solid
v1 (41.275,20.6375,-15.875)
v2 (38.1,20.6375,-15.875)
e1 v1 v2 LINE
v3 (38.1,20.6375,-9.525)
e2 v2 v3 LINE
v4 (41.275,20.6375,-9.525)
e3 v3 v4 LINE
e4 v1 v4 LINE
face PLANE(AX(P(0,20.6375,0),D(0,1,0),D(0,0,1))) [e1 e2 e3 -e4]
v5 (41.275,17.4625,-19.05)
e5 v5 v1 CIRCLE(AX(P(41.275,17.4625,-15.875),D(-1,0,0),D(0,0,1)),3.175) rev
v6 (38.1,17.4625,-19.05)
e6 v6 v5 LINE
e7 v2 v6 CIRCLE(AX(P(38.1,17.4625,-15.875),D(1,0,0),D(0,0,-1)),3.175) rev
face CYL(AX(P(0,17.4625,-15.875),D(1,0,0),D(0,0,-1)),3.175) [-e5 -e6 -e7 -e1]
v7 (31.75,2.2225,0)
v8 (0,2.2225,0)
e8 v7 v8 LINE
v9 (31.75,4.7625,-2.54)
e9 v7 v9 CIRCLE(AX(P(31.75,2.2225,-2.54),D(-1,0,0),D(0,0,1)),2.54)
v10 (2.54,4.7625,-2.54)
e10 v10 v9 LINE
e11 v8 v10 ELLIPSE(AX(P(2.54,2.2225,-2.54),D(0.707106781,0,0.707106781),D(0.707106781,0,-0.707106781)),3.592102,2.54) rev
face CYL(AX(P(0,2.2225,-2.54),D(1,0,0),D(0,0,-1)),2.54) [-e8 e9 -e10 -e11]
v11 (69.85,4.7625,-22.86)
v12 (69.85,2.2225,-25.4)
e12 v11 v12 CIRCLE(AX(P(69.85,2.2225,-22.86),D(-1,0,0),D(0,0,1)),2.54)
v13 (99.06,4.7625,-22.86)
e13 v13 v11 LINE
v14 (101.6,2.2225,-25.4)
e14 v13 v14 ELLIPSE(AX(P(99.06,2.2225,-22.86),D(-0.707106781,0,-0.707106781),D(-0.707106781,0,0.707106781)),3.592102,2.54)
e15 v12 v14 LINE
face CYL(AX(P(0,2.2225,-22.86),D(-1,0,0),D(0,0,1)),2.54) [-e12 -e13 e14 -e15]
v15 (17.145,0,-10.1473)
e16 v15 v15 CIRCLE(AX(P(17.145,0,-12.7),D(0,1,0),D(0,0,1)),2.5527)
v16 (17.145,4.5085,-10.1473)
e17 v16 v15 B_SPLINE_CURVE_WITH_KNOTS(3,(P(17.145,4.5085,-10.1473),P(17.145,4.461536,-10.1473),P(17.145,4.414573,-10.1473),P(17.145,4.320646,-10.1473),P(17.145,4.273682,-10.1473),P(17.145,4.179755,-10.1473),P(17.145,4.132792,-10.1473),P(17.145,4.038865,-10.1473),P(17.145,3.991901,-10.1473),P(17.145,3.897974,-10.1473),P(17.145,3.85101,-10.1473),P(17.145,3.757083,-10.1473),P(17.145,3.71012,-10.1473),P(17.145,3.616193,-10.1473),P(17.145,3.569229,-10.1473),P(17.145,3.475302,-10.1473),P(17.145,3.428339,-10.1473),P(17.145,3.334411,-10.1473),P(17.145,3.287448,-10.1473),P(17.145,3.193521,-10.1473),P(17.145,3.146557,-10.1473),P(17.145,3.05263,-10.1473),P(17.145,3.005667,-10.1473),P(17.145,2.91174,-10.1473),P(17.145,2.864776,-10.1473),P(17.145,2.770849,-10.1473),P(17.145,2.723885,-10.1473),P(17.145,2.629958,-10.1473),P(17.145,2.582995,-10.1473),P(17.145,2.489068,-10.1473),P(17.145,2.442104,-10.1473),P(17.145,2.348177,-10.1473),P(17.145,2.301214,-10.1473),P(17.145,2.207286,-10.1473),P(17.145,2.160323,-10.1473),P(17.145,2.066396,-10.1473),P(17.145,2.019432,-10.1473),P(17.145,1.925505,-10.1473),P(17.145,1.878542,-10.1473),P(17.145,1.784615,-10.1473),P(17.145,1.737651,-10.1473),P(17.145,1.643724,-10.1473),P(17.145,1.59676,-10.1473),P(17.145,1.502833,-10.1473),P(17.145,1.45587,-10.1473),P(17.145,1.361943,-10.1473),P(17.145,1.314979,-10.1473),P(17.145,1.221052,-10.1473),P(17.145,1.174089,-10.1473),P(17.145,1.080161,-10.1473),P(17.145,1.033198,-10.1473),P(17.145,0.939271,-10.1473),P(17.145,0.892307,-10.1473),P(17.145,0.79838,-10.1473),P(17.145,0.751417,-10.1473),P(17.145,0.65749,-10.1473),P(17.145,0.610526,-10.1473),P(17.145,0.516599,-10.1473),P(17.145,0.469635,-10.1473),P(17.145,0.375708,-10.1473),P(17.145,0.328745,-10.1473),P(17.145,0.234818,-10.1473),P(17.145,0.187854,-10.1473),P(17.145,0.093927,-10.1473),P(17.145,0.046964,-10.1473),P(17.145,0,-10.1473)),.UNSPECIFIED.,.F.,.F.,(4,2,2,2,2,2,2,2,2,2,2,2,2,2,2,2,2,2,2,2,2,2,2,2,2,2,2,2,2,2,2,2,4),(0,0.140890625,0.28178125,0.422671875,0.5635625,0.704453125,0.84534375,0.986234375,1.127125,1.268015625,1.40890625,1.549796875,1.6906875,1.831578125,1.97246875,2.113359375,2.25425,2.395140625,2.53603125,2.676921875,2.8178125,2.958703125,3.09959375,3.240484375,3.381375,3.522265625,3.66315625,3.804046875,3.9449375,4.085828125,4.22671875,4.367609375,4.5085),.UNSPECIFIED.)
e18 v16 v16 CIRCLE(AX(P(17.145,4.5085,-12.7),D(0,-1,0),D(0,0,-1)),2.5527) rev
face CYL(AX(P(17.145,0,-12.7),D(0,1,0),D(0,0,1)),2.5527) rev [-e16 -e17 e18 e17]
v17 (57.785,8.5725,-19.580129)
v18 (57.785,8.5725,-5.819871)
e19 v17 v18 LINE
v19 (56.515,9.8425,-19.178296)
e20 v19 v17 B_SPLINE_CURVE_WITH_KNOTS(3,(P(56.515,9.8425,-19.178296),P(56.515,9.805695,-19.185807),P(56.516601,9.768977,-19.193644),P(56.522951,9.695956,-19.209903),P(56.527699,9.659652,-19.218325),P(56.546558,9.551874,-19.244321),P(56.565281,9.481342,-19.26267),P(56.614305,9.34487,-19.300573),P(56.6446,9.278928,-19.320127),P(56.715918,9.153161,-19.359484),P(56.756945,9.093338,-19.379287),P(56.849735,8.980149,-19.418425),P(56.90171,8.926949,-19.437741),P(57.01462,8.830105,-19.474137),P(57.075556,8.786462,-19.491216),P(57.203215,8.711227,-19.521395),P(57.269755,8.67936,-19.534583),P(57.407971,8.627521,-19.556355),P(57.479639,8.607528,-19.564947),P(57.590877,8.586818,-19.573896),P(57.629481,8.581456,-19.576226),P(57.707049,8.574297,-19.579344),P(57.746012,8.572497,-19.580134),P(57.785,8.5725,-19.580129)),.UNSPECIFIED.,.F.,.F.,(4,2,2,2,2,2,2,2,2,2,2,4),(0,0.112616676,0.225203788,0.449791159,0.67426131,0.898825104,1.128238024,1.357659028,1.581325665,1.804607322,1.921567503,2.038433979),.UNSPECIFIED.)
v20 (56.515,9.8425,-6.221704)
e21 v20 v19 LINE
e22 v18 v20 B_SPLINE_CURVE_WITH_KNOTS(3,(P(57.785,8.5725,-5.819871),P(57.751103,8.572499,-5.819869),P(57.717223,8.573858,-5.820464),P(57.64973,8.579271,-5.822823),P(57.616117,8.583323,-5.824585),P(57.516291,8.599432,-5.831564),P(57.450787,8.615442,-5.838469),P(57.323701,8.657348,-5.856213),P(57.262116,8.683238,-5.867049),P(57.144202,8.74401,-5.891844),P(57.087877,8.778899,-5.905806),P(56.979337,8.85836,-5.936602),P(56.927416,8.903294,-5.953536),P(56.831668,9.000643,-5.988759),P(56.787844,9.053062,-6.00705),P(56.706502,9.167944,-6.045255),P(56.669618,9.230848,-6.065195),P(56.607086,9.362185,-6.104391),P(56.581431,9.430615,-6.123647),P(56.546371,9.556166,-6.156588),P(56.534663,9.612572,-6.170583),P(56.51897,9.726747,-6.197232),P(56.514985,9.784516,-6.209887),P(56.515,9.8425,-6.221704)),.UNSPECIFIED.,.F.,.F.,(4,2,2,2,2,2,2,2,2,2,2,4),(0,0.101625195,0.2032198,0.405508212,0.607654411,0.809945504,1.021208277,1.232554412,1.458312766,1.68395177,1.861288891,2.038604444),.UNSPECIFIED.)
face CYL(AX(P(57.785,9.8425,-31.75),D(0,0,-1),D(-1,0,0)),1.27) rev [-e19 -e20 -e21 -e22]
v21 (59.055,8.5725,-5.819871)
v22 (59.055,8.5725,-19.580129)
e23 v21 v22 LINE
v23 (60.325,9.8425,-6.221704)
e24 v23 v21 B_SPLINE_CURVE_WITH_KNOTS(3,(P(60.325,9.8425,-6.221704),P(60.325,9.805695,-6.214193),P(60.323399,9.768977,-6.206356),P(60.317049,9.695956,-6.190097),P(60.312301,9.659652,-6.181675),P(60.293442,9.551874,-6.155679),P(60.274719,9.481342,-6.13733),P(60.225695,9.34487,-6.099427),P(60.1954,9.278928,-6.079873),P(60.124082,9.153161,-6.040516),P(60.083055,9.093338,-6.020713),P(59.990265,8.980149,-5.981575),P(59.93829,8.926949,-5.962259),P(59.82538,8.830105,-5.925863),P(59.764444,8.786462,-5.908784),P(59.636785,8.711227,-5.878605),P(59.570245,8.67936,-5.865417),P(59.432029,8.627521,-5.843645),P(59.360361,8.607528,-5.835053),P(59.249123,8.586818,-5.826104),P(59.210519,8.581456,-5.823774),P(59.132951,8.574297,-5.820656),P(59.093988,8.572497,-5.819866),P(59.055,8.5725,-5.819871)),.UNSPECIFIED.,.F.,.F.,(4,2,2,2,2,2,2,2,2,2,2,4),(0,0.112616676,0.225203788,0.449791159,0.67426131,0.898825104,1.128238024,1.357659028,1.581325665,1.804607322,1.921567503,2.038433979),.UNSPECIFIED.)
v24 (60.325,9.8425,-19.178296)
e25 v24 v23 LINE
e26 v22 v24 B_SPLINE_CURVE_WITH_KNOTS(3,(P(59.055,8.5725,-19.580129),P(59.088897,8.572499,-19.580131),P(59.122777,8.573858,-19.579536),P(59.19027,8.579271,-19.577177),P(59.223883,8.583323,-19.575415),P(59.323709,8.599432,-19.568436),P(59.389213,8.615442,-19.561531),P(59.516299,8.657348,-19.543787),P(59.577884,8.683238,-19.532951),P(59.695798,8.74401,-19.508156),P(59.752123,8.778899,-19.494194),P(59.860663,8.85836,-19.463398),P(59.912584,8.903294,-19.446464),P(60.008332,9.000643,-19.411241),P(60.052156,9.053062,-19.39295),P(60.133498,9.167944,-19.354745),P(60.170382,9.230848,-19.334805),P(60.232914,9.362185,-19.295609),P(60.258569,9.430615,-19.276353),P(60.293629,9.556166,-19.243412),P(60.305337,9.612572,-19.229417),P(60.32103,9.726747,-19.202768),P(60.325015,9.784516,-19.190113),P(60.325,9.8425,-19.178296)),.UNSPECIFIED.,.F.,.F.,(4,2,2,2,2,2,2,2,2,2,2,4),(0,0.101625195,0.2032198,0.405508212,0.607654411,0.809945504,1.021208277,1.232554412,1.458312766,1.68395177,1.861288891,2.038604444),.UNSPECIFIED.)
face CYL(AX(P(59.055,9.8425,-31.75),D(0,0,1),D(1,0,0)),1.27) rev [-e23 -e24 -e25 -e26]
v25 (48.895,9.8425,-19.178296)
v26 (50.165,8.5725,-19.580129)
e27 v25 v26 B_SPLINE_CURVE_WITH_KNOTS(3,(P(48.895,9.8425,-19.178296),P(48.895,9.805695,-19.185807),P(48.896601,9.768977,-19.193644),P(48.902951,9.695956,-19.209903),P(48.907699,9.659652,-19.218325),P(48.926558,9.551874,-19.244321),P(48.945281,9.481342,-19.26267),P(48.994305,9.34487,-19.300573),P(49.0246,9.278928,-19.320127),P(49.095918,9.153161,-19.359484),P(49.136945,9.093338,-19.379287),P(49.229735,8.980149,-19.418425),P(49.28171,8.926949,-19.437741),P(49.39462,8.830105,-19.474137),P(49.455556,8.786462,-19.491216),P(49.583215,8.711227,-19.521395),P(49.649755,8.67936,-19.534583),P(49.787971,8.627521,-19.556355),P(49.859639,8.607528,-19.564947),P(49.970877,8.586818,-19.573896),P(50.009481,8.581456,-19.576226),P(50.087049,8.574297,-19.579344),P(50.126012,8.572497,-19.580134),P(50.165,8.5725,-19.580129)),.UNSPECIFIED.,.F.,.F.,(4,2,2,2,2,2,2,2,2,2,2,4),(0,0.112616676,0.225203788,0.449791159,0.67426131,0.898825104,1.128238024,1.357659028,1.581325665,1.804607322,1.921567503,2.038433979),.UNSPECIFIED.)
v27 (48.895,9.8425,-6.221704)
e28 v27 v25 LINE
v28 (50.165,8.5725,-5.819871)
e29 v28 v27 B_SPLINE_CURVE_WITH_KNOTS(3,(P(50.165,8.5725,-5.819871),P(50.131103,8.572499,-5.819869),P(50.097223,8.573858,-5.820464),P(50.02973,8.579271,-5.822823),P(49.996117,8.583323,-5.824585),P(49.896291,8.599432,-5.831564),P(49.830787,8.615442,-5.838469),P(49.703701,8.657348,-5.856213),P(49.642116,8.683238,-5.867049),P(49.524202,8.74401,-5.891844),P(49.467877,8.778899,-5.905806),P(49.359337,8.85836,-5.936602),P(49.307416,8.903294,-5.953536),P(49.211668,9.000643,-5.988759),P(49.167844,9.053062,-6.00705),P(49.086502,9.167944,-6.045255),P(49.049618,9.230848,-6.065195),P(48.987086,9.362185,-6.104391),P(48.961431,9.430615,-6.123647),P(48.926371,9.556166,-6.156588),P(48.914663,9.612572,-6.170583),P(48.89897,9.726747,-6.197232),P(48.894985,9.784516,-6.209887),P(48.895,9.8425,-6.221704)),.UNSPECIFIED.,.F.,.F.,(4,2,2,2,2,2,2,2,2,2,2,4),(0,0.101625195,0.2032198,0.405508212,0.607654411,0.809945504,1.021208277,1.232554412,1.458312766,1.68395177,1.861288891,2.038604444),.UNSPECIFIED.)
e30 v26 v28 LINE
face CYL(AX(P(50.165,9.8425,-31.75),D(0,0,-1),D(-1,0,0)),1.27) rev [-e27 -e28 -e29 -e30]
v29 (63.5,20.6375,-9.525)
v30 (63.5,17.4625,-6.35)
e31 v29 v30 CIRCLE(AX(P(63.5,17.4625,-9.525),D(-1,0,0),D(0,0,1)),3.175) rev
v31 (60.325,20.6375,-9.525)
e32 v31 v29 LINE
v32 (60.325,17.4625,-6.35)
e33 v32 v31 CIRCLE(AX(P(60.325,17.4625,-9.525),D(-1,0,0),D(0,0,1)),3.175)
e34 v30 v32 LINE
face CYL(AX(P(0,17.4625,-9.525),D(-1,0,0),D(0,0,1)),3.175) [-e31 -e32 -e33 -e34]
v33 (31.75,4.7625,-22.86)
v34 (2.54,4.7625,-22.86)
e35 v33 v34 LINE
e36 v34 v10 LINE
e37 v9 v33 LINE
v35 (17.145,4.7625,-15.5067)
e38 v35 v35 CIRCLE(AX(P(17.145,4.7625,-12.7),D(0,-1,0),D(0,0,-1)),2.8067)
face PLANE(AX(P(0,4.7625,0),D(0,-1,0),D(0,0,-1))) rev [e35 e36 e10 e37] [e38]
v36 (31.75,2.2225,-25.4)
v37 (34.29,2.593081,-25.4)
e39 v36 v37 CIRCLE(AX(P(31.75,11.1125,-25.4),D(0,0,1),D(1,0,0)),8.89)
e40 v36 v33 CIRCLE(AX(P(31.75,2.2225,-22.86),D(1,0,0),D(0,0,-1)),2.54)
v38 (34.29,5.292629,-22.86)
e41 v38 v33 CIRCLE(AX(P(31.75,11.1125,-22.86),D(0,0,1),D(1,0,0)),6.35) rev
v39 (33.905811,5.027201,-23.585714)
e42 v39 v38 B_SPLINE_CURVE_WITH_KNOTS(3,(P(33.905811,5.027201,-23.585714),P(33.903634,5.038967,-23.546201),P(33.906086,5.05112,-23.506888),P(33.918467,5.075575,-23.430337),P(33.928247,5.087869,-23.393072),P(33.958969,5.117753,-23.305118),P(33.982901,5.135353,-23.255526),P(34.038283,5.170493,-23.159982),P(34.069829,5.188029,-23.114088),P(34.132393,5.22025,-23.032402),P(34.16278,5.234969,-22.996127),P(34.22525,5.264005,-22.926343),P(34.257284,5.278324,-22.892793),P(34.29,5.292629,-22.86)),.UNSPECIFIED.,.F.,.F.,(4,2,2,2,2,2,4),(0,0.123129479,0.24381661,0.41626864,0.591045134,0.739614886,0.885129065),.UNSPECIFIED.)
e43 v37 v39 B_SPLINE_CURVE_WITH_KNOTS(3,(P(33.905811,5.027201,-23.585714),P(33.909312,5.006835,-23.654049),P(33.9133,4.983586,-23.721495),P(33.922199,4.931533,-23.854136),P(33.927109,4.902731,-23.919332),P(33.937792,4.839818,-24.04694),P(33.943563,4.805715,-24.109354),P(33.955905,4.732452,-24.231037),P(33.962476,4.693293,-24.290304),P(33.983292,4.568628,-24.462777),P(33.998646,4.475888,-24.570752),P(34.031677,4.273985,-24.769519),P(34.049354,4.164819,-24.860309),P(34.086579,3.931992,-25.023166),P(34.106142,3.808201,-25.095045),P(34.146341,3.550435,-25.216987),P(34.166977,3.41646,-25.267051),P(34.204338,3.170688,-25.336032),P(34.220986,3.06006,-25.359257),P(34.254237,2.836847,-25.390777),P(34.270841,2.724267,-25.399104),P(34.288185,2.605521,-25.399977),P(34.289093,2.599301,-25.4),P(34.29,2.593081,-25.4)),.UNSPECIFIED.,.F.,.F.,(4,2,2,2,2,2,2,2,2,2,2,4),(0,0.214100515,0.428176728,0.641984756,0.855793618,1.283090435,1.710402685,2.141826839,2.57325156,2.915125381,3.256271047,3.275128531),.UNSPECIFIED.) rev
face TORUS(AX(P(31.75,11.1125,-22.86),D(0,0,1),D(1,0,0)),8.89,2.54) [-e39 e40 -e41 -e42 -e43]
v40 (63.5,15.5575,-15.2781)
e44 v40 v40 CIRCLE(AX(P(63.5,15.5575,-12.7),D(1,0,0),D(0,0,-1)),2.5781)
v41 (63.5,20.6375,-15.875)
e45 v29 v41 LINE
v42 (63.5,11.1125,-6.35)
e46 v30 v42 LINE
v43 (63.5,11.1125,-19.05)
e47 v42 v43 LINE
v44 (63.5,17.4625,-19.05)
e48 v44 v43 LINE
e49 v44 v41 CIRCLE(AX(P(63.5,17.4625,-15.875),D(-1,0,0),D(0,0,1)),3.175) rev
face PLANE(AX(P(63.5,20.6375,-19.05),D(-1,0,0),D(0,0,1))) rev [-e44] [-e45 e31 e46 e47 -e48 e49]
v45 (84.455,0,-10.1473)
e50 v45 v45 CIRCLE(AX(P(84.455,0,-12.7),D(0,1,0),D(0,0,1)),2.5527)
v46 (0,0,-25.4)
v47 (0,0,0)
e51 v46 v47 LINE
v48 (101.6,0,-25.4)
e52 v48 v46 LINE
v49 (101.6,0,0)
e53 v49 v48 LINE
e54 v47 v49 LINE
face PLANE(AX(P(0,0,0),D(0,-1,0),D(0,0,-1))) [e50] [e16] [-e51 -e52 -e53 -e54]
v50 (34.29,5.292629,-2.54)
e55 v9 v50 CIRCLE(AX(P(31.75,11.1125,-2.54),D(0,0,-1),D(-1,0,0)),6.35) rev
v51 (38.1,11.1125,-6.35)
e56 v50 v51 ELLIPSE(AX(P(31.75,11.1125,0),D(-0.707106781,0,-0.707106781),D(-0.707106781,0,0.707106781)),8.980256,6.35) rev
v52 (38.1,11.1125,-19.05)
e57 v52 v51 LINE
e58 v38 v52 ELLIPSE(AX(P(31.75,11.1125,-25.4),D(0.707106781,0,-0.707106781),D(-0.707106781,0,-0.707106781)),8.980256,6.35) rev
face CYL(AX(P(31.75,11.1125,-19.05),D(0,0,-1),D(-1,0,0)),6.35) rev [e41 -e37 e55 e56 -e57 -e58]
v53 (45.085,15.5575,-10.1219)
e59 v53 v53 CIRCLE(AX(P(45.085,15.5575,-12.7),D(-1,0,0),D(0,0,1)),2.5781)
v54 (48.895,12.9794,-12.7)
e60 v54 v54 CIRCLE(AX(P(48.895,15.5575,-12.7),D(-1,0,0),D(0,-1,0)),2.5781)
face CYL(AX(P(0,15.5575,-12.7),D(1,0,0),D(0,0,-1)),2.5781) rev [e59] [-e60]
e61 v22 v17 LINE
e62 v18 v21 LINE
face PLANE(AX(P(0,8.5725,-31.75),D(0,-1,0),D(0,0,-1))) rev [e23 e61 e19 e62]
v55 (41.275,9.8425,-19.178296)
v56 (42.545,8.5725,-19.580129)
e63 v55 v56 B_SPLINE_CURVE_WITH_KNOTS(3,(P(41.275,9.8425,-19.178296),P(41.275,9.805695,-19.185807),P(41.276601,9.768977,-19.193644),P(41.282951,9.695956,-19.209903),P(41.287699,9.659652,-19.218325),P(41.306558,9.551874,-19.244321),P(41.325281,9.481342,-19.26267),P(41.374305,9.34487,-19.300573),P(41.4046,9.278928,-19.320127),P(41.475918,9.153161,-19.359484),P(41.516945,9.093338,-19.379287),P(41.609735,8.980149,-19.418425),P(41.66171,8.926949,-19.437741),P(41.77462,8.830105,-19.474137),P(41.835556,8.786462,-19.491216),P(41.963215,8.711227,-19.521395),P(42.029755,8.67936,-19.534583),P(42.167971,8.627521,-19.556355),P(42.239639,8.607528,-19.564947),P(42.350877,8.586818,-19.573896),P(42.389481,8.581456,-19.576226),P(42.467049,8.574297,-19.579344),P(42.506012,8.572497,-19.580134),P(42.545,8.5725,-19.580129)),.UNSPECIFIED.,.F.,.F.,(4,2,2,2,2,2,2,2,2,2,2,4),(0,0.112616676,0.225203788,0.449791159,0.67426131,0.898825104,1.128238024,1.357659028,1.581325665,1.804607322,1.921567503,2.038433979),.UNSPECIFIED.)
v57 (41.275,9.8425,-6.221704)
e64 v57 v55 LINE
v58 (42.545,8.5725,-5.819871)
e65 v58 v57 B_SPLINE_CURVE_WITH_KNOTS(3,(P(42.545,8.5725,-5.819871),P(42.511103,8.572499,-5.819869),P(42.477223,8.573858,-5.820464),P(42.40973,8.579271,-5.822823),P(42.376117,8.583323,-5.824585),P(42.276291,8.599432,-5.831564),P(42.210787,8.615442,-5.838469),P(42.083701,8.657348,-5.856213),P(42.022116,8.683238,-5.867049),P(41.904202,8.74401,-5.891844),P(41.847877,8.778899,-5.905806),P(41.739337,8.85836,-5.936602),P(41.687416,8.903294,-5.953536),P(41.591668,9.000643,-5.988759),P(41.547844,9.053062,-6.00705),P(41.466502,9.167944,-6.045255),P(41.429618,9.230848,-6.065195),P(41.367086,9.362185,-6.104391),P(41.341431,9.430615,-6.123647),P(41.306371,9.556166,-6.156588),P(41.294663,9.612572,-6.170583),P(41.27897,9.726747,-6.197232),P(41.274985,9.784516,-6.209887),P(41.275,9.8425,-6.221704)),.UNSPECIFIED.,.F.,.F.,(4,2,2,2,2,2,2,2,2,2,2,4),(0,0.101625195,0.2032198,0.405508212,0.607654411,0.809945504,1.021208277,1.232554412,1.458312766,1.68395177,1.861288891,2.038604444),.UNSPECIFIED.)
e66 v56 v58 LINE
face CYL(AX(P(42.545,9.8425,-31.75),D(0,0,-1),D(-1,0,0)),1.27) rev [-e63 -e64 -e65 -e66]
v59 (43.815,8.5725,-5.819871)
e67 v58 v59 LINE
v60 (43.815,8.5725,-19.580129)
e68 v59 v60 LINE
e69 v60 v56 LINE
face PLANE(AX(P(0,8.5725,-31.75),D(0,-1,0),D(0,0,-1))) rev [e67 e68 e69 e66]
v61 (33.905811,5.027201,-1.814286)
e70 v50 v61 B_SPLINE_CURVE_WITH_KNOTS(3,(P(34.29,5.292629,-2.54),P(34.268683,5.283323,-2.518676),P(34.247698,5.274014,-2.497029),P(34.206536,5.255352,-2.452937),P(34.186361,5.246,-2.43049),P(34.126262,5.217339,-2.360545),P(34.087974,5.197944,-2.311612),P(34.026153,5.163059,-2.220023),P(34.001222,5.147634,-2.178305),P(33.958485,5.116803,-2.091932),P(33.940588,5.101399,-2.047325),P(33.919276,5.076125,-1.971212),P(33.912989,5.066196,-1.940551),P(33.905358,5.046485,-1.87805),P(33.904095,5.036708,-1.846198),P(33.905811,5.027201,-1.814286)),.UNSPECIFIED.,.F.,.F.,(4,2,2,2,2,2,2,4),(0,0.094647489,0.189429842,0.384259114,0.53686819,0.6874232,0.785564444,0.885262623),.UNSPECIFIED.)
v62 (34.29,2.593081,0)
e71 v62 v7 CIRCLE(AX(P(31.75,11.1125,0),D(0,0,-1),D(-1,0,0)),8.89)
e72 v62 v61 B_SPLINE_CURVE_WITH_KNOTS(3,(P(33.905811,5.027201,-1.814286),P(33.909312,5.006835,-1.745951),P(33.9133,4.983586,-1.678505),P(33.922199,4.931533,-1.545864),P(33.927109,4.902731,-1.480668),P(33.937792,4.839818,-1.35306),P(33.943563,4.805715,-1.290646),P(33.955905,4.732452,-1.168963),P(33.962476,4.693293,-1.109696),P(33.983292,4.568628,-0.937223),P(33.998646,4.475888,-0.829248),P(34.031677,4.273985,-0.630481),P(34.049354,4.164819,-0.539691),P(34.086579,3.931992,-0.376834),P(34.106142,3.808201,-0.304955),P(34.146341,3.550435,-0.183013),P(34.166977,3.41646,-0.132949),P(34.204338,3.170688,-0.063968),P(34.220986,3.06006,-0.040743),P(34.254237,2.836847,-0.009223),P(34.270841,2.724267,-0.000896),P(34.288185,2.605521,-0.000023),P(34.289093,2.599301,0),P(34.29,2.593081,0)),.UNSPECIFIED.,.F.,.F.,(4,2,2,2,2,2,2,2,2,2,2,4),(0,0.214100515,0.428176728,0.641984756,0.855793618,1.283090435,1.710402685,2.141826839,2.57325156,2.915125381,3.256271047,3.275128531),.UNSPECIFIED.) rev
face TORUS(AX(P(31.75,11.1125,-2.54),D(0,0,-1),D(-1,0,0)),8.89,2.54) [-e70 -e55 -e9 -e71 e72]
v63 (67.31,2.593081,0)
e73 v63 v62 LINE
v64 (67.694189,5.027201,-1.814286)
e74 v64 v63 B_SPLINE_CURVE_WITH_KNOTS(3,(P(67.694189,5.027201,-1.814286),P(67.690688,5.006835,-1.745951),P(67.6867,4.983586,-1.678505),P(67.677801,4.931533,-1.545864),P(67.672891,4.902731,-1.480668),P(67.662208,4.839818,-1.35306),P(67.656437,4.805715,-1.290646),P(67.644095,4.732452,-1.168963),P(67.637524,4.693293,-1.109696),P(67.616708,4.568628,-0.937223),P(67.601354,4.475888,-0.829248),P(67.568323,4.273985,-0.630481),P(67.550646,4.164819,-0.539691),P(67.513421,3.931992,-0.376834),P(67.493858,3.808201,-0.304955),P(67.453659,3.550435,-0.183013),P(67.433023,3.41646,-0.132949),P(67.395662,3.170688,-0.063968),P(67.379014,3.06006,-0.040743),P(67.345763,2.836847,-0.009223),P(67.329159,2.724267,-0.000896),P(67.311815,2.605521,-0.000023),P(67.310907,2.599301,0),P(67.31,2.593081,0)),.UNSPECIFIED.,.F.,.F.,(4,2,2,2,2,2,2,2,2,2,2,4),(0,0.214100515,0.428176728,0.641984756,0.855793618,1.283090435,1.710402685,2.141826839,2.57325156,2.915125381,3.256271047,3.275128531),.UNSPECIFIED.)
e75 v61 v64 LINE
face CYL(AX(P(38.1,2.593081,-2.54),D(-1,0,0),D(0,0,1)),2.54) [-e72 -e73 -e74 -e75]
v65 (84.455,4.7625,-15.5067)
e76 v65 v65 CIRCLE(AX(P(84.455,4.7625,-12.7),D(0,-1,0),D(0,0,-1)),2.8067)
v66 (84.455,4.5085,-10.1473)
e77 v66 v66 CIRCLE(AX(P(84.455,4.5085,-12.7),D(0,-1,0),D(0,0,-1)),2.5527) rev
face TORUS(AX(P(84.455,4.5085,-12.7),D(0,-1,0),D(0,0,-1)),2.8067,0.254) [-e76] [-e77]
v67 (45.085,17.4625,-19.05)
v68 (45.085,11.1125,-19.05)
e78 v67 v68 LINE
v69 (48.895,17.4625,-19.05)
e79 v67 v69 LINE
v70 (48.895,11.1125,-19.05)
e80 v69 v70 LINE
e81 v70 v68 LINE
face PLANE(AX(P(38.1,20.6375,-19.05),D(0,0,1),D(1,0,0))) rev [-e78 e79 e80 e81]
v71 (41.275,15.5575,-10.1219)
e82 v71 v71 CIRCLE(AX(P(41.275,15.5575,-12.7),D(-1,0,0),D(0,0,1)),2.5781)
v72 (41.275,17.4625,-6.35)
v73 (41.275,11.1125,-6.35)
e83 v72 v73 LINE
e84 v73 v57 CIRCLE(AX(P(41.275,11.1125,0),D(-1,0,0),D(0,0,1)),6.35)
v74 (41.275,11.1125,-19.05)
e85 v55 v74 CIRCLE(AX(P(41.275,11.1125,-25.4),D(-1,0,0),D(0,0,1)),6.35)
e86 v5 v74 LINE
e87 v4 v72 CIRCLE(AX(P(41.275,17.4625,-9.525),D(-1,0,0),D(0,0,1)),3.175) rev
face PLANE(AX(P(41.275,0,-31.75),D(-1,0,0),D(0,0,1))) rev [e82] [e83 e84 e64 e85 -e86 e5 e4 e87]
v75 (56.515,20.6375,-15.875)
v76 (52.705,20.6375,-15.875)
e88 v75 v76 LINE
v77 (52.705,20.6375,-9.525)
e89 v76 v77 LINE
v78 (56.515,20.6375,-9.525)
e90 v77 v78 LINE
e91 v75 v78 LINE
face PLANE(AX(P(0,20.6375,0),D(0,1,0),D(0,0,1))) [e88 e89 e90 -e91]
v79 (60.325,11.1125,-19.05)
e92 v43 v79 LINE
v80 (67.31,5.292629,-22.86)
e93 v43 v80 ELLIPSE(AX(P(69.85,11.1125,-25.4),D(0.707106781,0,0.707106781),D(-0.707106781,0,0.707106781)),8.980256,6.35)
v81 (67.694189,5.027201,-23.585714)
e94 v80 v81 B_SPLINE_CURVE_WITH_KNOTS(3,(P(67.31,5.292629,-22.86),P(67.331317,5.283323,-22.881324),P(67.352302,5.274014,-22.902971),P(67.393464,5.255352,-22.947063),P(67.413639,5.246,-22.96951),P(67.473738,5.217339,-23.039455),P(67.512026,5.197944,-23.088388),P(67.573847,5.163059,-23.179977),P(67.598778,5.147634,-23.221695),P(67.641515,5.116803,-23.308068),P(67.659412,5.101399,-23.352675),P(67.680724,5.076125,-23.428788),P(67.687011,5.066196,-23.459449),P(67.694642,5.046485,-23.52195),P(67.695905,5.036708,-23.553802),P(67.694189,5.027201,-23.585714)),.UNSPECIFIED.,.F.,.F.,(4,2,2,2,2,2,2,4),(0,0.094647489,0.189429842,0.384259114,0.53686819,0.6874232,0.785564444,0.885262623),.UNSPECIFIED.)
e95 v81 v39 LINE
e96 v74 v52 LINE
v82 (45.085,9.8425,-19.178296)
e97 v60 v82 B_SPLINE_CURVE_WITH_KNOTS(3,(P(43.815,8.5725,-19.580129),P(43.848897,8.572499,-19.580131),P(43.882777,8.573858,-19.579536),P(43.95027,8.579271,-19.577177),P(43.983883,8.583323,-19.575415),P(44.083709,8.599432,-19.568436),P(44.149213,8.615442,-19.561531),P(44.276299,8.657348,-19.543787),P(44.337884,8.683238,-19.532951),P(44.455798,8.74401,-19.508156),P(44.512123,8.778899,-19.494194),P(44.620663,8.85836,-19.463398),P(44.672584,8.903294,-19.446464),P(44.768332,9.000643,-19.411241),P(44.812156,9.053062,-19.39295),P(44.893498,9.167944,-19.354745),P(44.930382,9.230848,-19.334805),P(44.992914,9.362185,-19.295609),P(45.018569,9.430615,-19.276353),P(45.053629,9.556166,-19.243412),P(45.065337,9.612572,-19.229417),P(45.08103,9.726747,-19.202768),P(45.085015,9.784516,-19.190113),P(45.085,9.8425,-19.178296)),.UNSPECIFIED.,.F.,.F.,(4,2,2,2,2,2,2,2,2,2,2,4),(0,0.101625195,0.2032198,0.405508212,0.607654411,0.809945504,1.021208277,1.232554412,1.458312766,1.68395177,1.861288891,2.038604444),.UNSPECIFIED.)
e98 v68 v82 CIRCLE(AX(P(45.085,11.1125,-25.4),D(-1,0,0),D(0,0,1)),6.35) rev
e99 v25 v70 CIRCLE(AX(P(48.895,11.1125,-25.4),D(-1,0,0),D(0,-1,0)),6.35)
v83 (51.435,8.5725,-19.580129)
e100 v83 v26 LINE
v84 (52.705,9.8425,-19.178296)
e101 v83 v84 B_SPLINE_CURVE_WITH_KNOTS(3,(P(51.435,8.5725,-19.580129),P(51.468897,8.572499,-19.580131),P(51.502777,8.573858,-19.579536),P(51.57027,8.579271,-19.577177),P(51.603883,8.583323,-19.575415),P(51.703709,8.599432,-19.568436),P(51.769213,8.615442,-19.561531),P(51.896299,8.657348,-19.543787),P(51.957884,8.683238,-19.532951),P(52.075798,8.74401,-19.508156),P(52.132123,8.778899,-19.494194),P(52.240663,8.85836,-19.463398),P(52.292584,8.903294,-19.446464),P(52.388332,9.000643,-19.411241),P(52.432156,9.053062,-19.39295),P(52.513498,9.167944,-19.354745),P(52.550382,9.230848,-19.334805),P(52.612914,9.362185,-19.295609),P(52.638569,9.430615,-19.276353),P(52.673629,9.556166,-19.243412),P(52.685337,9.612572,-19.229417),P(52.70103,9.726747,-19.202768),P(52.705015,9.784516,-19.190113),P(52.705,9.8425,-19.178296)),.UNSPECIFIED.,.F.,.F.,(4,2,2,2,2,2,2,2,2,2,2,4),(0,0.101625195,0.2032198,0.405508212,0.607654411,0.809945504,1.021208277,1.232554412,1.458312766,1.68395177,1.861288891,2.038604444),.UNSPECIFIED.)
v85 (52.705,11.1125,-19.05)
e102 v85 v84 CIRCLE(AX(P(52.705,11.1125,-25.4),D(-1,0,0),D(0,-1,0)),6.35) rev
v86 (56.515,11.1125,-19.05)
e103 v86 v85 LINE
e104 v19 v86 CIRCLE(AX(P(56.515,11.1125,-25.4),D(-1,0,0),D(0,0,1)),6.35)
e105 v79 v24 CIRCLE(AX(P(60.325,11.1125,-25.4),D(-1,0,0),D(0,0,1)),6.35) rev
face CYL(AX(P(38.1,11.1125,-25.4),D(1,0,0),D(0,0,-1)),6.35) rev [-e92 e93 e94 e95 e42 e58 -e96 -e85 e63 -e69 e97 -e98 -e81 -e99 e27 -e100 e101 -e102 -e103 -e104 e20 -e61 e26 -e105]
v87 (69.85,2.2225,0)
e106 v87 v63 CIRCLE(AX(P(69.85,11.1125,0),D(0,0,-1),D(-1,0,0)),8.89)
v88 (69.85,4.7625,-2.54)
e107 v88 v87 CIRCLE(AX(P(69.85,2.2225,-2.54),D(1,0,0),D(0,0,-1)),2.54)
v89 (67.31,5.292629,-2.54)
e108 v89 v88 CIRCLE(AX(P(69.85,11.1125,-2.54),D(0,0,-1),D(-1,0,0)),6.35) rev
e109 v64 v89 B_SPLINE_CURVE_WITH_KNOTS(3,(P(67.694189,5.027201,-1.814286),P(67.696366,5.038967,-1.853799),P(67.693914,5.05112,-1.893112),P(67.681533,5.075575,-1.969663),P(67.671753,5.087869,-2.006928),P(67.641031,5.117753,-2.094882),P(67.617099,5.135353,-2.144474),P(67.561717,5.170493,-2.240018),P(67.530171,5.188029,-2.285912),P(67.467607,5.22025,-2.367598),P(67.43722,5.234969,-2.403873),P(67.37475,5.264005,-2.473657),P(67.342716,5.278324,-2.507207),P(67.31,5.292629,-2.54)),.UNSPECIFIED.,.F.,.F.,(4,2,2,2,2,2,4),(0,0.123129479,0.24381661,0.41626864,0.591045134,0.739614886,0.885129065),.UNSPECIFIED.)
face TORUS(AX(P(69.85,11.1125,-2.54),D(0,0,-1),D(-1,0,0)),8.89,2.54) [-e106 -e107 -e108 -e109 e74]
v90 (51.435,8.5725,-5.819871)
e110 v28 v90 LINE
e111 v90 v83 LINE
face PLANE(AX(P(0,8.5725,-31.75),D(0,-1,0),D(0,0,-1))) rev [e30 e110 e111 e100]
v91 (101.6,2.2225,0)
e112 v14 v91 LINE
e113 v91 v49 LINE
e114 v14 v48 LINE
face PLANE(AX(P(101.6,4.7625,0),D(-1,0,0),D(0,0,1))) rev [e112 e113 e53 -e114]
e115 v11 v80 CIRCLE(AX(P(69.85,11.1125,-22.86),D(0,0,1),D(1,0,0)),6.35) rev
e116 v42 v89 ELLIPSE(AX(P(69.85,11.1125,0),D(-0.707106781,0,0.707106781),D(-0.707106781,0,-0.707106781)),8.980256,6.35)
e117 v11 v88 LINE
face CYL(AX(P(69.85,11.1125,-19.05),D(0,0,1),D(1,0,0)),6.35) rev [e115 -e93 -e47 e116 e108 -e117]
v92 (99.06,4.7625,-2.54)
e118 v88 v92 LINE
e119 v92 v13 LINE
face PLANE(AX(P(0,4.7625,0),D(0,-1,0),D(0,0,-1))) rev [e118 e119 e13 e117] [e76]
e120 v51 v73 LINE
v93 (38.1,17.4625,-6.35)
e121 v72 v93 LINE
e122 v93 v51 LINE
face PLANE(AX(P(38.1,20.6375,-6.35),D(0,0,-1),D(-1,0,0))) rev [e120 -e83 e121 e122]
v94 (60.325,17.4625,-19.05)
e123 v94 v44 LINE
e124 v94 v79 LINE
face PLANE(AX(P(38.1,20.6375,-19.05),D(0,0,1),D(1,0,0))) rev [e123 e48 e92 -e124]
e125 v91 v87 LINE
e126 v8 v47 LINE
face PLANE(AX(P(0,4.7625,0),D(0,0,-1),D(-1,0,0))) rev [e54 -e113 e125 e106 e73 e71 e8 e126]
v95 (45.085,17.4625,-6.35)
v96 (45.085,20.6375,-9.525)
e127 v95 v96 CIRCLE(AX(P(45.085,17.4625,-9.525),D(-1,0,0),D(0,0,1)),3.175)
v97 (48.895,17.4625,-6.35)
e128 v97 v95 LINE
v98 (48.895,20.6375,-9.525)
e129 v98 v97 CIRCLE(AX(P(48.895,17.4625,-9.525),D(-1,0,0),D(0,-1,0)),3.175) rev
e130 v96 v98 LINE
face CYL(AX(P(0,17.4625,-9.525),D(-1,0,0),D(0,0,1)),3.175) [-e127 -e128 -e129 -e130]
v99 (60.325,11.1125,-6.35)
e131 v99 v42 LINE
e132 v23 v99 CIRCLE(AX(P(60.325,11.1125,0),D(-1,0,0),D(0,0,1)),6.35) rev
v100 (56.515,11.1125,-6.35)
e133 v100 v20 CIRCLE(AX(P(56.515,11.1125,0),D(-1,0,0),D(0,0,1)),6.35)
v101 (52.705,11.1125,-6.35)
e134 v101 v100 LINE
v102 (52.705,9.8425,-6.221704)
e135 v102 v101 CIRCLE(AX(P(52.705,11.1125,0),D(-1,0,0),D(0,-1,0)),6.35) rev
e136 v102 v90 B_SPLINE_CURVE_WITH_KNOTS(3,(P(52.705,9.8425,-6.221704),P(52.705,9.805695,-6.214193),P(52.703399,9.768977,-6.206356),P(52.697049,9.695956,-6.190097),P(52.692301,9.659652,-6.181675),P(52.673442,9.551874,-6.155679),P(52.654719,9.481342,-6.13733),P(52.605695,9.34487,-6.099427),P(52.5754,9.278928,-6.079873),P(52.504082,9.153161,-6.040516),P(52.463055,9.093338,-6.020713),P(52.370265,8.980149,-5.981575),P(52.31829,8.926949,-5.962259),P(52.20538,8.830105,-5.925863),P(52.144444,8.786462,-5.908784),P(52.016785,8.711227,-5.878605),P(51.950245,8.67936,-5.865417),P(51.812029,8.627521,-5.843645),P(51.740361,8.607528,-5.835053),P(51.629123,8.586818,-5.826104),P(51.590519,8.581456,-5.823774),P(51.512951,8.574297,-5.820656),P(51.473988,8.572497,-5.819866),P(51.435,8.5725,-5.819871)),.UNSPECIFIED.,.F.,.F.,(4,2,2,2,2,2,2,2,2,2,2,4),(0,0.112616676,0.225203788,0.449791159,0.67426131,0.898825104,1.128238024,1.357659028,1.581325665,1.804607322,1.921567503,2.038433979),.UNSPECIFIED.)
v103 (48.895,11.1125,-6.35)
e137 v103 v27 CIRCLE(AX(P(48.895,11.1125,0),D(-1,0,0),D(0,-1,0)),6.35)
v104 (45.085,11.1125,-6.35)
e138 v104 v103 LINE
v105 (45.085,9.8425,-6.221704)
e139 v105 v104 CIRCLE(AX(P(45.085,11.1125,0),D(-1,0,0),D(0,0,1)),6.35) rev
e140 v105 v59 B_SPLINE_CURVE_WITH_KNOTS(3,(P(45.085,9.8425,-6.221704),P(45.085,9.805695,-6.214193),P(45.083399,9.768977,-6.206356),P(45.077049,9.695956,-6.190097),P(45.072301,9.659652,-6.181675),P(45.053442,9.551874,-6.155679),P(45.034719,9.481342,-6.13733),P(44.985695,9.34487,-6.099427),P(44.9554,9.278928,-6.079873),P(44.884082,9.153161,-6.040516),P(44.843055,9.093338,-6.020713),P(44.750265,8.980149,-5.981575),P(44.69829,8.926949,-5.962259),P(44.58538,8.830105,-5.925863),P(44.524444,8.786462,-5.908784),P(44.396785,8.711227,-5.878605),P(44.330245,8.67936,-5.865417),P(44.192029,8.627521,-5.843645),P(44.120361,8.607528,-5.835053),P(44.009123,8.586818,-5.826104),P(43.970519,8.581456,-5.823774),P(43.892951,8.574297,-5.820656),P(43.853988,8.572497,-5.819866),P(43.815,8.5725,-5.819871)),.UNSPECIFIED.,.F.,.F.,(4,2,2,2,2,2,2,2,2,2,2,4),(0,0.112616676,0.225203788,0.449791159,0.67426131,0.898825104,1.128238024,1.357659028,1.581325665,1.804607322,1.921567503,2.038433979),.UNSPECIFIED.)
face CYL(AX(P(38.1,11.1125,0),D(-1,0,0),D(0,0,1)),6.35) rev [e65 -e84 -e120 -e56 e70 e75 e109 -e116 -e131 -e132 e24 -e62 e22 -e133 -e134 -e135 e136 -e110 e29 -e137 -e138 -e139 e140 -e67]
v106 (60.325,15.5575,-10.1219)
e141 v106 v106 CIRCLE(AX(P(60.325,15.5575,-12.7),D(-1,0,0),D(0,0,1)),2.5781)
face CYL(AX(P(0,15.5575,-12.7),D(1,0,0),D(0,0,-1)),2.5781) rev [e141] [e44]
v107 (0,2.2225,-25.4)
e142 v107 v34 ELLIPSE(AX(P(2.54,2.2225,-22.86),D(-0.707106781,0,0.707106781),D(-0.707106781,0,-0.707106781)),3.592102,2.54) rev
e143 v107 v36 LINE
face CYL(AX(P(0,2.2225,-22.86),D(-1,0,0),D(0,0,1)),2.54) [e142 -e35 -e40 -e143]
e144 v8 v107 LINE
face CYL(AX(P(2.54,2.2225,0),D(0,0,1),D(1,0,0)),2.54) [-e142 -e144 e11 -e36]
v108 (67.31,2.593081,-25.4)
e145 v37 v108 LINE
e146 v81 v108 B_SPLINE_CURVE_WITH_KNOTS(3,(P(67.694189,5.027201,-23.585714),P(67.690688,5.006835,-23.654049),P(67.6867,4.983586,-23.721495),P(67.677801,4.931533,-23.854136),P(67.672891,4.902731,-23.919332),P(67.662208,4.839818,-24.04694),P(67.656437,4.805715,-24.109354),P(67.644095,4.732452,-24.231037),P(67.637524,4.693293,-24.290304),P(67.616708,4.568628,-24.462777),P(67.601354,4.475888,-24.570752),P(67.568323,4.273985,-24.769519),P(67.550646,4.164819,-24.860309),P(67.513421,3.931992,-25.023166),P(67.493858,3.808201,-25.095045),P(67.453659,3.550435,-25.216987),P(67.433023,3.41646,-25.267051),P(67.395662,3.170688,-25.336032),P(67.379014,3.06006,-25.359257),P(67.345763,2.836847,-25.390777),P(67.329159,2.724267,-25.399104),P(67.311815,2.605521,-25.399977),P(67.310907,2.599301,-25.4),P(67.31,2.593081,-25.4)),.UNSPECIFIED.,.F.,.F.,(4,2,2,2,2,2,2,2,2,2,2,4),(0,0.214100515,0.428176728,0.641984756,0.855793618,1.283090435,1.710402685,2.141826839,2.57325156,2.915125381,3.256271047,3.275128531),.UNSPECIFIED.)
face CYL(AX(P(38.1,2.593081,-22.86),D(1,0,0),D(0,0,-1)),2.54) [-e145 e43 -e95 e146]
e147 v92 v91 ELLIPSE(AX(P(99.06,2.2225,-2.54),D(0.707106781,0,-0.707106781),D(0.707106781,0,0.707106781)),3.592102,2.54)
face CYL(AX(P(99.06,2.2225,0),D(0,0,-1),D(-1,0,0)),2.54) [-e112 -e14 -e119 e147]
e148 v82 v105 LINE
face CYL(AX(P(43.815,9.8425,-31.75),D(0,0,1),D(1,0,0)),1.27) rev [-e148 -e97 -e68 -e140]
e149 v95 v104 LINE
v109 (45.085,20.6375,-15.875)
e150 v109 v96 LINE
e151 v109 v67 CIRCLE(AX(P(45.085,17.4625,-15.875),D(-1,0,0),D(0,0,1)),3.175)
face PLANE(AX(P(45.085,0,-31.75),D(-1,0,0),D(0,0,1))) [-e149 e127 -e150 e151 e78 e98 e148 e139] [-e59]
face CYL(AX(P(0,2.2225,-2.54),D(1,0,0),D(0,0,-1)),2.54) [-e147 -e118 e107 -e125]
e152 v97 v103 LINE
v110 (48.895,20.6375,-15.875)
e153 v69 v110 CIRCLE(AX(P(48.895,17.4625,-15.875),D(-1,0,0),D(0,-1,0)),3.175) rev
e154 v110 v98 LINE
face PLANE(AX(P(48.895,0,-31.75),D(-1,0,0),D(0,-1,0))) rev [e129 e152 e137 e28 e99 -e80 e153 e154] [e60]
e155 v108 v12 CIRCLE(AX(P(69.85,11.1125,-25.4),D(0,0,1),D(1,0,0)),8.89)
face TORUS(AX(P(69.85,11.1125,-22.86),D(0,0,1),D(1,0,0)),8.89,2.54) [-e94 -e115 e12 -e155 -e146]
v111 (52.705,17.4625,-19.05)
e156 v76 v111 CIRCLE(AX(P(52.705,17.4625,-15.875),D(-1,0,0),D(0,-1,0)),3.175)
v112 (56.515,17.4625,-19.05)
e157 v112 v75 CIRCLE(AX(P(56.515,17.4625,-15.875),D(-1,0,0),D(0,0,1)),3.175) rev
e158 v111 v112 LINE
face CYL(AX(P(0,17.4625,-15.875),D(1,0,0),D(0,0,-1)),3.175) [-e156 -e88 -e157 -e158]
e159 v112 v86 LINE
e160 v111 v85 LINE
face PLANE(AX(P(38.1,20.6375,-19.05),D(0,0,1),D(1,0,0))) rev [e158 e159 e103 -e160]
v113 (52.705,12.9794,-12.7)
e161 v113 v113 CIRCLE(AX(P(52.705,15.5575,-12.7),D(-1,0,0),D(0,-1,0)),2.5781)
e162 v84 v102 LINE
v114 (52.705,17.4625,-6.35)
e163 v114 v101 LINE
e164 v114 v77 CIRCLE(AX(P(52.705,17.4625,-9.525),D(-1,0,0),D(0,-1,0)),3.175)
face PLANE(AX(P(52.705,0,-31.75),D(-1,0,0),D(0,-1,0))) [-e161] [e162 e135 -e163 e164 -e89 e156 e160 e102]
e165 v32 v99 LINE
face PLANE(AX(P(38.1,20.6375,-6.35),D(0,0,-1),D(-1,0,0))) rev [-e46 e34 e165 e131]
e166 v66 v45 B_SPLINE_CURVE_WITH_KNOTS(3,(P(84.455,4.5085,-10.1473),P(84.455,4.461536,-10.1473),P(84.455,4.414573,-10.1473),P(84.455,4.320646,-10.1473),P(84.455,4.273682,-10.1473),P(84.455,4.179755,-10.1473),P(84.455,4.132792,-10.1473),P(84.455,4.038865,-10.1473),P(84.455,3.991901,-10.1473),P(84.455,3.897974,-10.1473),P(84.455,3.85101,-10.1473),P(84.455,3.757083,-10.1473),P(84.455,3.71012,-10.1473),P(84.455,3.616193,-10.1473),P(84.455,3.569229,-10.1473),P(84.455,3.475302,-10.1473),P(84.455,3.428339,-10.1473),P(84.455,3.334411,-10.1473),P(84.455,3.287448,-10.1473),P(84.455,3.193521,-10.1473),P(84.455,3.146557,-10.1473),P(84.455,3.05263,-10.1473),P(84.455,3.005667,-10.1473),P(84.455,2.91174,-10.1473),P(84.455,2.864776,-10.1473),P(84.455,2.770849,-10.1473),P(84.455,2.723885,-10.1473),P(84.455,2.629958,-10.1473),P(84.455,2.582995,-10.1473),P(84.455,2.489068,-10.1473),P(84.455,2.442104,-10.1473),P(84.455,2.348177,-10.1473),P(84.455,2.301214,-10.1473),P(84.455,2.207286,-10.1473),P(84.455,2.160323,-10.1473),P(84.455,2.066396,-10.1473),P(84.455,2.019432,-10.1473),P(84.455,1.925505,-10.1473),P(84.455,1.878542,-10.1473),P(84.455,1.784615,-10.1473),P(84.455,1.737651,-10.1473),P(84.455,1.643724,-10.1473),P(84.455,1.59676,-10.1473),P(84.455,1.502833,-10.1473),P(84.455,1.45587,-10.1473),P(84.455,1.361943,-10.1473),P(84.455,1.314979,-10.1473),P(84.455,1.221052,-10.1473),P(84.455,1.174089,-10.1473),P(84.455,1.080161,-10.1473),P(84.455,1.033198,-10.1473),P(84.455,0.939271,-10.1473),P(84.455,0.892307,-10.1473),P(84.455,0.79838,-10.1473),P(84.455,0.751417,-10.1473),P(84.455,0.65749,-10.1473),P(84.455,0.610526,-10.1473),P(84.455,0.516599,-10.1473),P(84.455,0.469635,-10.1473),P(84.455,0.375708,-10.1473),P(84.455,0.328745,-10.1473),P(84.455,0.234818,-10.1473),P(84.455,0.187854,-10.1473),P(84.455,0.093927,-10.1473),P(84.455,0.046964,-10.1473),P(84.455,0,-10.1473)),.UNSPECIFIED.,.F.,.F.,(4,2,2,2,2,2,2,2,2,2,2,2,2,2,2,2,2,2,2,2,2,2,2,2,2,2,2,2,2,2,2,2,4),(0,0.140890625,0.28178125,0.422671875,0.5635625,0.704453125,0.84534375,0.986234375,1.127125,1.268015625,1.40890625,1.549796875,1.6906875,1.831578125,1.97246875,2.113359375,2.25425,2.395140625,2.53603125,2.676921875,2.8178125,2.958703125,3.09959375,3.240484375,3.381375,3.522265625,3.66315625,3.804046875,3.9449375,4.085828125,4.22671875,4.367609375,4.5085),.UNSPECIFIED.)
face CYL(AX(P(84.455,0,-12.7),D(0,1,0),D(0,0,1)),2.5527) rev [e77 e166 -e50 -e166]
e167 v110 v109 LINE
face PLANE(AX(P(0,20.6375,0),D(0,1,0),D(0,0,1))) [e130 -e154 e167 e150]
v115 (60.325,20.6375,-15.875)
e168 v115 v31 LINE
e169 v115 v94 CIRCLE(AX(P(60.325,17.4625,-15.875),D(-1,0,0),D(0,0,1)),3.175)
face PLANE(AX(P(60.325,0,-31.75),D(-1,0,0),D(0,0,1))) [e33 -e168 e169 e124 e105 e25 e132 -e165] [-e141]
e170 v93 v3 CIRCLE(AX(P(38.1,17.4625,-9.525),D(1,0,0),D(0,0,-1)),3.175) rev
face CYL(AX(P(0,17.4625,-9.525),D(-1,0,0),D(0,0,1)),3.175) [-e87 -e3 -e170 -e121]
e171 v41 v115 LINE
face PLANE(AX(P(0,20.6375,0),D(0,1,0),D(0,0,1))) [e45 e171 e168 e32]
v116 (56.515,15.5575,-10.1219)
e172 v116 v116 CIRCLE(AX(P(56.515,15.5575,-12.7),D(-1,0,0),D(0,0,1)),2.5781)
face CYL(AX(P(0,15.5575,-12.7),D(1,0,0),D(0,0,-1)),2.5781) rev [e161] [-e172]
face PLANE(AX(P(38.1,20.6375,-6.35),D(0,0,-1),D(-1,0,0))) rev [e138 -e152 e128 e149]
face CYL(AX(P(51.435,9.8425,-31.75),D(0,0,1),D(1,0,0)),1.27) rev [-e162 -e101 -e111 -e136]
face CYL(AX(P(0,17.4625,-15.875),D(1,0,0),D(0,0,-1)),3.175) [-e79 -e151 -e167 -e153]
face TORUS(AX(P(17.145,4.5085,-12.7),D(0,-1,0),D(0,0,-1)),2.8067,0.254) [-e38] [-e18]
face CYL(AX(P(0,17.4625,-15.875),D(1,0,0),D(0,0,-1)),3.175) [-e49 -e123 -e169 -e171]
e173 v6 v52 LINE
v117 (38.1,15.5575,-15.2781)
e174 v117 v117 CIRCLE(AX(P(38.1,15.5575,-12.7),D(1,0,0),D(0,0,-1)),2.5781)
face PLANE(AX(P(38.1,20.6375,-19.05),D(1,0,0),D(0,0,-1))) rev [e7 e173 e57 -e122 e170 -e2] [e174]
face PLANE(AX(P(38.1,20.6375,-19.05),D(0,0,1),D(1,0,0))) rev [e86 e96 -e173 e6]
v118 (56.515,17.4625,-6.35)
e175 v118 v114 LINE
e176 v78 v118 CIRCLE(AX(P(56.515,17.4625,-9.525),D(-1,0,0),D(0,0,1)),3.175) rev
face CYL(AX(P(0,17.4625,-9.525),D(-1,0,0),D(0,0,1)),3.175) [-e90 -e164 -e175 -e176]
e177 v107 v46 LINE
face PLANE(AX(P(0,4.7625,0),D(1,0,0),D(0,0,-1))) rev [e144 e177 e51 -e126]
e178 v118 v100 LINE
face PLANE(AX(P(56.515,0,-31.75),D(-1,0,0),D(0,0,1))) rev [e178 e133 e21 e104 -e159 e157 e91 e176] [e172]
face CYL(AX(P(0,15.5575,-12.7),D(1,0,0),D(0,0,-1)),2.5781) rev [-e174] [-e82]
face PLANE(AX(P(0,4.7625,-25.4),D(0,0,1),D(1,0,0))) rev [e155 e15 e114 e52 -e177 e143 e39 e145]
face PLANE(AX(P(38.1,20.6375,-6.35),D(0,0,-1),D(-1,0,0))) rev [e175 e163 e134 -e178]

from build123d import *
from build123d.topology import SkipClean

# Parameters (mm, degrees)
SKETCH1_W           = 101.6
SKETCH1_H           = 25.4
BOSS_EXTRUDE1_DEPTH = 4.7625
SKETCH2_W           = 25.4
SKETCH2_H           = 12.7
BOSS_EXTRUDE2_DEPTH = 15.875
SKETCH3_W           = 3.81
SKETCH3_H           = 12.065
CUT_EXTRUDE1_DEPTH  = 25.4
SKETCH4_R           = 2.5781
CUT_EXTRUDE2_DEPTH  = 72.4375
FILLET2_START       = 45.085
FILLET2_DEPTH       = 3.81
FILLET2_START_2     = 52.705
FILLET2_2_DEPTH     = 3.81
FILLET2_START_3     = 38.1
FILLET2_3_DEPTH     = 3.175
FILLET2_START_4     = 60.325
FILLET2_4_DEPTH     = 3.175
FILLET2_START_5     = -25.4
FILLET2_5_OUTLINE_W = 3.81
FILLET2_5_OUTLINE_H = 3.81
FILLET2_5_DEPTH     = 25.4
FILLET2_6_DEPTH     = 101.6
FILLET3_2_DEPTH     = 101.6
FILLET3_3_DEPTH     = 31.75
FILLET3_START       = 69.85
FILLET3_4_DEPTH     = 31.75
FILLET3_START_2     = -26
FILLET3_5_DEPTH     = 27
FILLET4_R           = 3.175
FILLET5_R           = 1.27
SKETCH5_R           = 2.5527
CUT_EXTRUDE3_DEPTH  = 106.923253491
FILLET6_R           = 0.254


with BuildPart() as part:
    # Sketch1 → Boss-Extrude1 (new body)
    with BuildSketch(Plane(origin=(0, 0, 0), x_dir=(1, 0, 0), z_dir=(0, 1, 0))):
        with Locations((50.8, 12.7)):
            Rectangle(SKETCH1_W, SKETCH1_H)
    extrude(amount=BOSS_EXTRUDE1_DEPTH)

    # Sketch2 → Boss-Extrude2 (add)
    with BuildSketch(Plane(origin=(0, 4.7625, 0), x_dir=(1, 0, 0), z_dir=(0, 1, 0))):
        with Locations((50.8, 12.7)):
            Rectangle(SKETCH2_W, SKETCH2_H)
    extrude(amount=BOSS_EXTRUDE2_DEPTH)

    # Sketch3 → Cut-Extrude1 (cut)
    with BuildSketch(Plane.XY.offset(-6.35)):
        with Locations((50.8, 14.605)):
            Rectangle(SKETCH3_W, SKETCH3_H)
        with Locations((43.18, 14.605)):
            Rectangle(SKETCH3_W, SKETCH3_H)
        with Locations((58.42, 14.605)):
            Rectangle(SKETCH3_W, SKETCH3_H)
    extrude(amount=-CUT_EXTRUDE1_DEPTH, mode=Mode.SUBTRACT)

    # Sketch4 → Cut-Extrude2 (cut, through all)
    with BuildSketch(Plane(origin=(63.5, 0, 0), x_dir=(0, 0, -1), z_dir=(1, 0, 0))):
        with Locations((12.7, 15.5575)):
            Circle(SKETCH4_R)
    extrude(amount=-CUT_EXTRUDE2_DEPTH, mode=Mode.SUBTRACT)

    # Fillet2: read off the stored shape, not the designer's step
    # Fillet2 outline → Fillet2 (add)
    with BuildSketch(Plane.YZ.offset(FILLET2_START)):
        with BuildLine():
            Line((4.7625, -6.35), (11.1125, -6.35))
            ThreePointArc((11.1125, -6.35), (6.622371939, -4.490128061), (4.7625, 0))
            Line((4.7625, 0), (4.7625, -6.35))
        make_face()
        with BuildLine():
            Line((11.1125, -19.05), (4.7625, -19.05))
            Line((4.7625, -19.05), (4.7625, -25.4))
            ThreePointArc((4.7625, -25.4), (6.622371939, -20.909871939), (11.1125, -19.05))
        make_face()
    extrude(amount=FILLET2_DEPTH)

    # Fillet2 2 outline → Fillet2 2 (add)
    with BuildSketch(Plane.YZ.offset(FILLET2_START_2)):
        with BuildLine():
            Line((4.7625, -6.35), (11.1125, -6.35))
            ThreePointArc((11.1125, -6.35), (6.622371939, -4.490128061), (4.7625, 0))
            Line((4.7625, 0), (4.7625, -6.35))
        make_face()
        with BuildLine():
            Line((11.1125, -19.05), (4.7625, -19.05))
            Line((4.7625, -19.05), (4.7625, -25.4))
            ThreePointArc((4.7625, -25.4), (6.622371939, -20.909871939), (11.1125, -19.05))
        make_face()
    extrude(amount=FILLET2_2_DEPTH)

    # Fillet2 3 outline → Fillet2 3 (add)
    with BuildSketch(Plane.YZ.offset(FILLET2_START_3)):
        with BuildLine():
            Line((4.7625, -6.35), (11.1125, -6.35))
            ThreePointArc((11.1125, -6.35), (6.622371939, -4.490128061), (4.7625, 0))
            Line((4.7625, 0), (4.7625, -6.35))
        make_face()
        with BuildLine():
            Line((11.1125, -19.05), (4.7625, -19.05))
            Line((4.7625, -19.05), (4.7625, -25.4))
            ThreePointArc((4.7625, -25.4), (6.622371939, -20.909871939), (11.1125, -19.05))
        make_face()
    extrude(amount=FILLET2_3_DEPTH)

    # Fillet2 4 outline → Fillet2 4 (add)
    with BuildSketch(Plane.YZ.offset(FILLET2_START_4)):
        with BuildLine():
            Line((4.7625, -6.35), (11.1125, -6.35))
            ThreePointArc((11.1125, -6.35), (6.622371939, -4.490128061), (4.7625, 0))
            Line((4.7625, 0), (4.7625, -6.35))
        make_face()
        with BuildLine():
            Line((11.1125, -19.05), (4.7625, -19.05))
            Line((4.7625, -19.05), (4.7625, -25.4))
            ThreePointArc((4.7625, -25.4), (6.622371939, -20.909871939), (11.1125, -19.05))
        make_face()
    extrude(amount=FILLET2_4_DEPTH)

    # Fillet2 5 outline → Fillet2 5 (add)
    with BuildSketch(Plane.XY.offset(FILLET2_START_5)):
        with BuildLine():
            ThreePointArc((69.85, 4.7625), (65.359871939, 6.622371939), (63.5, 11.1125))
            Line((63.5, 11.1125), (63.5, 4.7625))
            Line((63.5, 4.7625), (69.85, 4.7625))
        make_face()
        with BuildLine():
            Line((38.1, 4.7625), (38.1, 11.1125))
            ThreePointArc((38.1, 11.1125), (36.240128061, 6.622371939), (31.75, 4.7625))
            Line((31.75, 4.7625), (38.1, 4.7625))
        make_face()
        with Locations((58.42, 6.6675)):
            Rectangle(FILLET2_5_OUTLINE_W, FILLET2_5_OUTLINE_H)
        with Locations((43.18, 6.6675)):
            Rectangle(FILLET2_5_OUTLINE_W, FILLET2_5_OUTLINE_H)
        with Locations((50.8, 6.6675)):
            Rectangle(FILLET2_5_OUTLINE_W, FILLET2_5_OUTLINE_H)
    extrude(amount=FILLET2_5_DEPTH)

    # Fillet2 6 outline → Fillet2 6 (cut)
    with SkipClean():  # the faces are left unmerged after this step: merging them gives an invalid solid
        with BuildSketch(Plane.YZ):
            with BuildLine():
                Line((11.1125, -6.35), (13, -6.35))
                Line((13, -6.35), (13, 0))
                Line((13, 0), (4.7625, 0))
                ThreePointArc((4.7625, 0), (6.622371939, -4.490128061), (11.1125, -6.35))
            make_face()
            with BuildLine():
                Line((4.7625, -25.4), (13, -25.4))
                Line((13, -25.4), (13, -19.05))
                Line((13, -19.05), (11.1125, -19.05))
                ThreePointArc((11.1125, -19.05), (6.622371939, -20.909871939), (4.7625, -25.4))
            make_face()
        extrude(amount=FILLET2_6_DEPTH, mode=Mode.SUBTRACT)
    add(part.part.scale(1), mode=Mode.REPLACE)  # the faces are merged on a copy

    # Fillet3: read off the stored shape, not the designer's step
    # Fillet3 outline → Fillet3 (revolve, cut)
    with BuildSketch(Plane(origin=(31.75, 11.1125, 0), x_dir=(1, 0, 0), z_dir=(0, -1, 0))):
        with BuildLine():
            Line((6.35, 0), (6.35, -2.54))
            ThreePointArc((6.35, -2.54), (7.093948776, -0.743948776), (8.89, 0))
            Line((8.89, 0), (6.35, 0))
        make_face()
        with BuildLine():
            ThreePointArc((8.89, -25.4), (7.093948776, -24.656051224), (6.35, -22.86))
            Line((6.35, -22.86), (6.35, -25.4))
            Line((6.35, -25.4), (8.89, -25.4))
        make_face()
    revolve(axis=Axis((31.75, 11.1125, 0), (0, 0, 1)), mode=Mode.SUBTRACT)

    # Fillet3 2 outline → Fillet3 2 (cut)
    with BuildSketch(Plane.YZ):
        with BuildLine():
            Line((4.7625, 0), (2.593081006, 0))
            ThreePointArc((2.593081006, 0), (4.111021339, -0.503469337), (5.027200718, -1.814285714))
            ThreePointArc((5.027200718, -1.814285714), (4.829023636, -0.916746847), (4.7625, 0))
        make_face()
        with BuildLine():
            Line((2.593081006, -25.4), (4.7625, -25.4))
            ThreePointArc((4.7625, -25.4), (4.829023636, -24.483253153), (5.027200718, -23.585714286))
            ThreePointArc((5.027200718, -23.585714286), (4.111021339, -24.896530663), (2.593081006, -25.4))
        make_face()
    extrude(amount=FILLET3_2_DEPTH, mode=Mode.SUBTRACT)

    # Fillet3 3 outline → Fillet3 3 (cut)
    with BuildSketch(Plane.YZ):
        with BuildLine():
            ThreePointArc((4.7625, -1.218931786), (3.837284915, -0.325602422), (2.593081006, 0))
            Line((2.593081006, 0), (2.2225, 0))
            ThreePointArc((2.2225, 0), (4.018551224, -0.743948776), (4.7625, -2.54))
            Line((4.7625, -2.54), (4.7625, -1.218931786))
        make_face()
        with BuildLine():
            Line((4.7625, -24.181068214), (4.7625, -22.86))
            ThreePointArc((4.7625, -22.86), (4.018551224, -24.656051224), (2.2225, -25.4))
            Line((2.2225, -25.4), (2.593081006, -25.4))
            ThreePointArc((2.593081006, -25.4), (3.837284915, -25.074397578), (4.7625, -24.181068214))
        make_face()
    extrude(amount=FILLET3_3_DEPTH, mode=Mode.SUBTRACT)

    # Fillet3 4 outline → Fillet3 4 (cut)
    with BuildSketch(Plane.YZ.offset(FILLET3_START)):
        with BuildLine():
            ThreePointArc((4.7625, -1.218931786), (3.837284915, -0.325602422), (2.593081006, 0))
            Line((2.593081006, 0), (2.2225, 0))
            ThreePointArc((2.2225, 0), (4.018551224, -0.743948776), (4.7625, -2.54))
            Line((4.7625, -2.54), (4.7625, -1.218931786))
        make_face()
        with BuildLine():
            Line((4.7625, -24.181068214), (4.7625, -22.86))
            ThreePointArc((4.7625, -22.86), (4.018551224, -24.656051224), (2.2225, -25.4))
            Line((2.2225, -25.4), (2.593081006, -25.4))
            ThreePointArc((2.593081006, -25.4), (3.837284915, -25.074397578), (4.7625, -24.181068214))
        make_face()
    extrude(amount=FILLET3_4_DEPTH, mode=Mode.SUBTRACT)

    # Fillet3 5 outline → Fillet3 5 (cut)
    with BuildSketch(Plane.XY.offset(FILLET3_START_2)):
        with BuildLine():
            Line((101.6, 4.7625), (99.06, 4.7625))
            ThreePointArc((99.06, 4.7625), (100.856051224, 4.018551224), (101.6, 2.2225))
            Line((101.6, 2.2225), (101.6, 4.7625))
        make_face()
        with BuildLine():
            ThreePointArc((0, 2.2225), (0.743948776, 4.018551224), (2.54, 4.7625))
            Line((2.54, 4.7625), (0, 4.7625))
            Line((0, 4.7625), (0, 2.2225))
        make_face()
    extrude(amount=FILLET3_5_DEPTH, mode=Mode.SUBTRACT)

    # Fillet3 6 outline → Fillet3 6 (revolve, cut)
    with BuildSketch(Plane(origin=(69.85, 11.1125, 0), x_dir=(1, 0, 0), z_dir=(0, -1, 0))):
        with BuildLine():
            Line((6.35, 0), (6.35, -2.54))
            ThreePointArc((6.35, -2.54), (7.093948776, -0.743948776), (8.89, 0))
            Line((8.89, 0), (6.35, 0))
        make_face()
        with BuildLine():
            ThreePointArc((8.89, -25.4), (7.093948776, -24.656051224), (6.35, -22.86))
            Line((6.35, -22.86), (6.35, -25.4))
            Line((6.35, -25.4), (8.89, -25.4))
        make_face()
    revolve(axis=Axis((69.85, 11.1125, 0), (0, 0, 1)), mode=Mode.SUBTRACT)

    # Fillet4
    fillet4_edges = [part.edges().sort_by_distance(p)[0] for p in [
        (39.6875, 20.6375, -6.35),
        (61.9125, 20.6375, -19.05),
        (46.99, 20.6375, -6.35),
        (54.61, 20.6375, -6.35),
        (61.9125, 20.6375, -6.35),
        (54.61, 20.6375, -19.05),
        (46.99, 20.6375, -19.05),
        (39.6875, 20.6375, -19.05),
    ]]
    fillet(fillet4_edges, radius=FILLET4_R)

    # Fillet5
    fillet5_edges = [part.edges().sort_by_distance(p)[0] for p in [
        (60.325, 8.5725, -12.7),
        (56.515, 8.5725, -12.7),
        (45.085, 8.5725, -12.7),
        (41.275, 8.5725, -12.7),
        (52.705, 8.5725, -12.7),
        (48.895, 8.5725, -12.7),
    ]]
    fillet(fillet5_edges, radius=FILLET5_R)

    # Sketch5 → Cut-Extrude3 (cut, through all)
    with BuildSketch(Plane(origin=(0, 4.7625, 0), x_dir=(1, 0, 0), z_dir=(0, 1, 0))):
        with Locations(Location((17.145, 12.7, 0), (0, 0, 270))):
            Circle(SKETCH5_R)
        with Locations(Location((84.455, 12.7, 0), (0, 0, 270))):
            Circle(SKETCH5_R)
    extrude(amount=-CUT_EXTRUDE3_DEPTH, mode=Mode.SUBTRACT)

    # Fillet6
    fillet6_edges = [part.edges().sort_by_distance(p)[0] for p in [
        (17.145, 4.7625, -15.2527),
        (84.455, 4.7625, -15.2527),
    ]]
    fillet(fillet6_edges, radius=FILLET6_R)


solid = part.part
